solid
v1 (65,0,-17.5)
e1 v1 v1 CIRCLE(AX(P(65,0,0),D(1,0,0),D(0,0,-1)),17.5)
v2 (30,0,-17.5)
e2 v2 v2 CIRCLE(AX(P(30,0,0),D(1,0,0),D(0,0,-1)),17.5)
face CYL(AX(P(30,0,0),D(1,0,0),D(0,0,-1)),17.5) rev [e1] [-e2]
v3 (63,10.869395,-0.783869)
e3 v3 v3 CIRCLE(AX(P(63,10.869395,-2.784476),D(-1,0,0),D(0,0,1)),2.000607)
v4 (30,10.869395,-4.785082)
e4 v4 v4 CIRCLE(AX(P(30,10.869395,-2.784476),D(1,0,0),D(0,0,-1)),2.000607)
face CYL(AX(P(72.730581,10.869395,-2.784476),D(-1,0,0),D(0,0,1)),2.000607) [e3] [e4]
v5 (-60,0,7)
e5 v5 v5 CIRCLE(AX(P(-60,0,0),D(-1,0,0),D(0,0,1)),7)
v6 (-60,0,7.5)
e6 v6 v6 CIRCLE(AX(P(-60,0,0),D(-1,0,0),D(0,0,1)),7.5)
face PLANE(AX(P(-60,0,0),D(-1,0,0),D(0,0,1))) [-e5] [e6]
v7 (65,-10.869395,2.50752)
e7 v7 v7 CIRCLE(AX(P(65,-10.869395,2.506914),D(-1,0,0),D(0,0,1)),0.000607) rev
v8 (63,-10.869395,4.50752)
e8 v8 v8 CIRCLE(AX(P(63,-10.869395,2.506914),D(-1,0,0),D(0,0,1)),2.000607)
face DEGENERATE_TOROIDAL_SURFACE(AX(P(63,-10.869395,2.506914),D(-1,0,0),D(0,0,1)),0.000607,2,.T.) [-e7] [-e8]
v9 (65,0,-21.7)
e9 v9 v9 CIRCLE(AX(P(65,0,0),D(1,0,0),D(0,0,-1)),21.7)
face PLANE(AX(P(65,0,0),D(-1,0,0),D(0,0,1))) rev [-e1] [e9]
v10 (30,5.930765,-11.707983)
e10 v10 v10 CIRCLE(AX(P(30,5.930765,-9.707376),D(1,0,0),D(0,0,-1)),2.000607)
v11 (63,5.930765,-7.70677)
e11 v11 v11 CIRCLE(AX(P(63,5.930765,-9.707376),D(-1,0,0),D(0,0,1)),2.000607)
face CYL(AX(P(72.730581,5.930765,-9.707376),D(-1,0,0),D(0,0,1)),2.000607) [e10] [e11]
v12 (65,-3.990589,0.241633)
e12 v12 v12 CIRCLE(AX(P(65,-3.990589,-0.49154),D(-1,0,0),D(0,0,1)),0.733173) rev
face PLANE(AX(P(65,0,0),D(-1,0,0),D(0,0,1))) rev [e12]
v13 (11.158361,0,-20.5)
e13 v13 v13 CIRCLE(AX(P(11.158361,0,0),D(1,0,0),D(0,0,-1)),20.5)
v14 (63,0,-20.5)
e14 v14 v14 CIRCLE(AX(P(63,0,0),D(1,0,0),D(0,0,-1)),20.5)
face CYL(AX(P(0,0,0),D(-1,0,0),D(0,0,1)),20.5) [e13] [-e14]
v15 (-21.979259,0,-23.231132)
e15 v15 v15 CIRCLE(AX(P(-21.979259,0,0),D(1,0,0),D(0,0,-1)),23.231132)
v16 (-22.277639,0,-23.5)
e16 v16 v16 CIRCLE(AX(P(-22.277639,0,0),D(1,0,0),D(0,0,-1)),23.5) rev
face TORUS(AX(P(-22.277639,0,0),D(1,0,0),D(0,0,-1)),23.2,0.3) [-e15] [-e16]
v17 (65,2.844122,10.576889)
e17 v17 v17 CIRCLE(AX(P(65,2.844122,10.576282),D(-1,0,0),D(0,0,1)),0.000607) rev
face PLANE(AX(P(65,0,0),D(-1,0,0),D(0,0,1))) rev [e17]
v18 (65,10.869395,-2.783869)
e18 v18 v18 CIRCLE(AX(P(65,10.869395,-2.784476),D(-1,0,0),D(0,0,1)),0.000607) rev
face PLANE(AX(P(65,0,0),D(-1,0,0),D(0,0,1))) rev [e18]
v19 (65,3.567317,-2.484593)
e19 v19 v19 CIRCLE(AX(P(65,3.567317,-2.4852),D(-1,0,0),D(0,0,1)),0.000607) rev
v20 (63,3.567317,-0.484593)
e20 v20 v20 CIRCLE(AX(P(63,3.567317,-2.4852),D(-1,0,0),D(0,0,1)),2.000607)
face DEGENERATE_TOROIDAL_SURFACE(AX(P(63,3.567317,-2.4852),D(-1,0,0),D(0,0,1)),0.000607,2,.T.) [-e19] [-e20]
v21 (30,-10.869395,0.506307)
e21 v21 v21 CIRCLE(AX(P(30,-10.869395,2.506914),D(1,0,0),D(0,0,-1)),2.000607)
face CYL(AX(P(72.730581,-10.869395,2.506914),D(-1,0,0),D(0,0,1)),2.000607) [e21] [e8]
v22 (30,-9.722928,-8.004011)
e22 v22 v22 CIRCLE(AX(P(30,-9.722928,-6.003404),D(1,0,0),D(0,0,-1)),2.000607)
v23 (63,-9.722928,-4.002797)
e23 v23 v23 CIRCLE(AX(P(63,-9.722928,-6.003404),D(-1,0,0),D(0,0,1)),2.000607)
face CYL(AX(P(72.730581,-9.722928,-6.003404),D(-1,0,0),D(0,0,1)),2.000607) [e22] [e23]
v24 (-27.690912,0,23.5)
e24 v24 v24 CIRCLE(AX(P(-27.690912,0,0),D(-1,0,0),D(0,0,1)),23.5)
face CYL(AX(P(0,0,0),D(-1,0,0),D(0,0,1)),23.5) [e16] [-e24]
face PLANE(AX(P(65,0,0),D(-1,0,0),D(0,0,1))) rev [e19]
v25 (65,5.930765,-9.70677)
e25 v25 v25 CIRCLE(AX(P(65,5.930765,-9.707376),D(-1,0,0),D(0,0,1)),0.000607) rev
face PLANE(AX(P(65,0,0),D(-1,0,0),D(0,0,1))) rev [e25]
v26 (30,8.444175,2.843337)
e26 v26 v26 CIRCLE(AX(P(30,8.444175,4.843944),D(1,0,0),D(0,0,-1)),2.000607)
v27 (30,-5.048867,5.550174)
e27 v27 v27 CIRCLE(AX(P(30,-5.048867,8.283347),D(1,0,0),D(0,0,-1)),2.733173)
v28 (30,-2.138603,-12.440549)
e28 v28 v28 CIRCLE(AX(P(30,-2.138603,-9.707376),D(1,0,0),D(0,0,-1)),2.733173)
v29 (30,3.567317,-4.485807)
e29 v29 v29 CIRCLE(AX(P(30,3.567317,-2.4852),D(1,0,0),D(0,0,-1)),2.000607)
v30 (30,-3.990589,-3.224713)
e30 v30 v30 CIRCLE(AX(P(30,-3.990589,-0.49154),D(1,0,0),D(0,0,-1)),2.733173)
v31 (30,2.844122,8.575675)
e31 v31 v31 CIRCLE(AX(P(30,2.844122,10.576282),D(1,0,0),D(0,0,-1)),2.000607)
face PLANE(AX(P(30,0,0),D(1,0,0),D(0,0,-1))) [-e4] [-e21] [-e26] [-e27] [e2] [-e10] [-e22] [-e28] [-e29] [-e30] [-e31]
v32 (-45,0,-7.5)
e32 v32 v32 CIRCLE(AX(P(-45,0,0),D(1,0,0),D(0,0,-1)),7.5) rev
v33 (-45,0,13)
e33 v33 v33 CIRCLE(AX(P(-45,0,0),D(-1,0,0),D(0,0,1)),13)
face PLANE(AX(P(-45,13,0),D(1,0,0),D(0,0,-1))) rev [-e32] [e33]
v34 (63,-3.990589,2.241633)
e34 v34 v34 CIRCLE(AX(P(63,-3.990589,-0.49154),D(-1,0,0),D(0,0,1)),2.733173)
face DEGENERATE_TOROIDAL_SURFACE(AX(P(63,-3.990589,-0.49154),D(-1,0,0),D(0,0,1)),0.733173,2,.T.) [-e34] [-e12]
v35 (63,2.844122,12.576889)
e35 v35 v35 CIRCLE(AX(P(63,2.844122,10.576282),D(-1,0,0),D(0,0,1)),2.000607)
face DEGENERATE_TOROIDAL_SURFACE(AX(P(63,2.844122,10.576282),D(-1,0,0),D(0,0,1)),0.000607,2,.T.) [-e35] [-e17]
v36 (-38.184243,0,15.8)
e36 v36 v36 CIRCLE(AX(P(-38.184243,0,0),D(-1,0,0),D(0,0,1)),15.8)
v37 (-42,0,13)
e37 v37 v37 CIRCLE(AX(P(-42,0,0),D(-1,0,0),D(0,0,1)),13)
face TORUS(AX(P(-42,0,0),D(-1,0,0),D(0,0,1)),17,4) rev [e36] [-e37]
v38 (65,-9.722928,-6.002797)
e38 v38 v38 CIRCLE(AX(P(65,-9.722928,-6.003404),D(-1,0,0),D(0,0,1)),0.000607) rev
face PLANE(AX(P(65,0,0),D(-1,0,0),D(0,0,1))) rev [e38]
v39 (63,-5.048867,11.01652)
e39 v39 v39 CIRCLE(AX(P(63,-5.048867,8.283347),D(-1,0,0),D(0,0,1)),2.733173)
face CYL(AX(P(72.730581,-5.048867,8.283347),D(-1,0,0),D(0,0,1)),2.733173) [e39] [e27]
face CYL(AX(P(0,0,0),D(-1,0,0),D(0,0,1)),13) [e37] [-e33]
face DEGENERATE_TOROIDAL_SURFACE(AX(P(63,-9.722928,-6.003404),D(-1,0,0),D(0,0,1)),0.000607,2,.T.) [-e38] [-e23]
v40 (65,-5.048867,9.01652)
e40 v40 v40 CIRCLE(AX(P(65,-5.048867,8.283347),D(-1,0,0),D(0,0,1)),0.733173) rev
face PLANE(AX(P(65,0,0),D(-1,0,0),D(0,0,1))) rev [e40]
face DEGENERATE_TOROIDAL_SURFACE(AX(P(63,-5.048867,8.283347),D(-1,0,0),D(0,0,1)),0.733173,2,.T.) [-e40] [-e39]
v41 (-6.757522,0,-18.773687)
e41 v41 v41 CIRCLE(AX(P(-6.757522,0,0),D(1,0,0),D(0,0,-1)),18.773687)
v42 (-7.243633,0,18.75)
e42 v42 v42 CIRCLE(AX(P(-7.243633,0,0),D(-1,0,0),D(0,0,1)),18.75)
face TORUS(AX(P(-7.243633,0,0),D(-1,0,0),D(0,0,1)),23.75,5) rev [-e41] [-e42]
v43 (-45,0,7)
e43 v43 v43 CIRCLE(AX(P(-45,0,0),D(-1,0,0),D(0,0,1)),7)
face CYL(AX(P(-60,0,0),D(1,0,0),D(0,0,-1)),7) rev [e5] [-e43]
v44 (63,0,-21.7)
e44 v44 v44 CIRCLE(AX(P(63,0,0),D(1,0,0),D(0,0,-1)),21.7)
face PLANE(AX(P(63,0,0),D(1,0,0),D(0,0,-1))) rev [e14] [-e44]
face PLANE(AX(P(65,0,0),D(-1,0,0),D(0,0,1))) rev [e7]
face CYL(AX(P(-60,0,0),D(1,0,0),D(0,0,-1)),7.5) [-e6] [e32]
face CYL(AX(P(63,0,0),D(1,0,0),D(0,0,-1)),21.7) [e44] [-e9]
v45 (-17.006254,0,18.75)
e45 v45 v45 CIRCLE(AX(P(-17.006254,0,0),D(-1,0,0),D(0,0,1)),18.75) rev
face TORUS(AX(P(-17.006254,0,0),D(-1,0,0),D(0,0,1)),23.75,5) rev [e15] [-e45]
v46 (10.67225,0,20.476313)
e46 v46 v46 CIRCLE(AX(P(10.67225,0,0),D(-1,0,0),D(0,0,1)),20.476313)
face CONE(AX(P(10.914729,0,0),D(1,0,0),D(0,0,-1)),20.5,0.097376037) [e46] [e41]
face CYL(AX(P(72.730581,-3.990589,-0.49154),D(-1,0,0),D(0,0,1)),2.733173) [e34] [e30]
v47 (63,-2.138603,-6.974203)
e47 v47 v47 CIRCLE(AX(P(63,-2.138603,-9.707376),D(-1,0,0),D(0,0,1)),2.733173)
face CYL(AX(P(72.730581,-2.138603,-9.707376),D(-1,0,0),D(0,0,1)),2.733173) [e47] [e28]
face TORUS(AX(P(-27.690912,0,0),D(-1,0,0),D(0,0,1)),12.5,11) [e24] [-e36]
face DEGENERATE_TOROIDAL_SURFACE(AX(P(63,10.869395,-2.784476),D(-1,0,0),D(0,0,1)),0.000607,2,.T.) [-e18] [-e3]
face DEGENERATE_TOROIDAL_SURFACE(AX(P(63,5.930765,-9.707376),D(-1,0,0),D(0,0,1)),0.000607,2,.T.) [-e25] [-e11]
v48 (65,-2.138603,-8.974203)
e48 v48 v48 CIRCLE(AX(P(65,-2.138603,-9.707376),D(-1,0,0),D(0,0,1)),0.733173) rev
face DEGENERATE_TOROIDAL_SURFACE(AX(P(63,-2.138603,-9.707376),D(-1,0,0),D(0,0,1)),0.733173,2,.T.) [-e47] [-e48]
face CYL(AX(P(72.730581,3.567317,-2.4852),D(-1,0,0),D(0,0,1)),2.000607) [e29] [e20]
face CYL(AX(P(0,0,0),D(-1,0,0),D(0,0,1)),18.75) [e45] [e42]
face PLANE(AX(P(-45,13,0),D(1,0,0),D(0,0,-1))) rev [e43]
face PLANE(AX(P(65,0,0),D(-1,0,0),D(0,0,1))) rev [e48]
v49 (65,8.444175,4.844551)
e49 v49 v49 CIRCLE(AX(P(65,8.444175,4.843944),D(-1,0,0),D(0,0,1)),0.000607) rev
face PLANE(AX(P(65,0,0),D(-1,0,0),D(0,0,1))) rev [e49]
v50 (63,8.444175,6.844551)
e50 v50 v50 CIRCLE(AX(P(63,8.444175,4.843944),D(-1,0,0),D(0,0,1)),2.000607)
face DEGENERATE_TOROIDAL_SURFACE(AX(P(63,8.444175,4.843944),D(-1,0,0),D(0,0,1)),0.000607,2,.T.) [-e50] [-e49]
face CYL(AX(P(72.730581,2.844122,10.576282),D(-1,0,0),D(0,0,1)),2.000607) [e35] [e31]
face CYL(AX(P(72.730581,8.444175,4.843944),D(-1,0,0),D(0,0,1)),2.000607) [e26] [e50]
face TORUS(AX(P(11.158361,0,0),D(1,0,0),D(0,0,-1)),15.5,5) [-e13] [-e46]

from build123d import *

# Parameters (mm, degrees)
FILLET1_R           = 5
FILLET2_R           = 0.3
FILLET3_R           = 5
SKETCH4_R           = 17.500000000000004
CUT_EXTRUDE1_DEPTH  = 35
SKETCH5_R           = 2.0006066698857174
SKETCH5_R_2         = 2.0006066698857157
SKETCH5_R_3         = 2.000606669885716
SKETCH5_R_4         = 2.733173099565215
BOSS_EXTRUDE1_DEPTH = 35
FILLET4_R           = 2
BOSS_EXTRUDE2_START = -2
SKETCH6_R           = 21.7
SKETCH6_R_2         = 20.5
BOSS_EXTRUDE2_DEPTH = 2
SKETCH7_R           = 7.5
SKETCH7_R_2         = 7
EXTRUDE_THIN1_DEPTH = 15


with BuildPart() as part:
    # Sketch3 → Revolve1 (revolve)
    with BuildSketch(Plane.XY, mode=Mode.PRIVATE) as revolve1_sk:
        with BuildLine():
            Line((65, 0), (65, 20.5))
            Line((65, 20.5), (10.914728577346645, 20.499999999999993))
            Line((10.914728577346645, 20.499999999999993), (-6.999999999999965, 18.75))
            Line((-6.999999999999965, 18.75), (-21.999999999999996, 18.749999999999993))
            Line((-21.999999999999996, 18.749999999999993), (-21.999999999999996, 23.5))
            Line((-21.999999999999996, 23.5), (-27.690911978745813, 23.5))
            ThreePointArc((-27.690911978745813, 23.5), (-34.19859974015539, 21.368483523128404), (-38.18424319433221, 15.800000000000004))
            ThreePointArc((-38.18424319433221, 15.800000000000004), (-39.63356808676015, 13.775096900680587), (-41.99999999999999, 13.000000000000009))
            Line((-41.99999999999999, 13.000000000000009), (-45, 13.000000000000004))
            Line((-45, 13.000000000000004), (-45, 0))
            Line((-45, 0), (-41.99999999999999, 0))
            Line((-41.99999999999999, 0), (65, 0))
        make_face()
    revolve(revolve1_sk.sketch.rotate(Axis((0, 0, 0), (1, 0, 0)), 90), axis=Axis((0, 0, 0), (1, 0, 0)))

    # Fillet1
    # the kernel refuses this fillet: 5 mm, written as the material it adds along each edge
    with BuildSketch(Plane(origin=(-21.999999999999996, 0, 0), x_dir=(0, 1.1e-16, 1), z_dir=(0, 1, -1.1e-16))) as fillet1_piece_1:
        with BuildLine():
            CenterArc((23.75, 4.993746088859545), FILLET1_R, 180, 87.13401601740111)
            Line((23.5, 0), (23.495, -0.09987492177718948))
            ThreePointArc((23.495, -0.09987492177718948), (21.124999999999996, -0.10000000000000142), (18.749999999999993, -0.10000000000000142))
            Line((18.749999999999993, -0.10000000000000142), (18.64999999999999, 0))
            Line((18.64999999999999, 0), (18.65, 4.993746088859545))
            Line((18.65, 4.993746088859545), (18.75, 4.993746088859545))
        make_face()
    revolve(axis=Axis((-21.999999999999996, 0, 0), (1, 0, 0)))

    # Fillet2
    fillet2_edges = [part.edges().sort_by_distance(p)[0] for p in [
        (-21.999999999999996, 4.95e-15, -23.5),
    ]]
    fillet(fillet2_edges, radius=FILLET2_R)

    # Fillet3
    # the kernel refuses this fillet: 5 mm, written as the material it adds along each edge
    with BuildSketch(Plane(origin=(-6.999999999999965, 0, 0), x_dir=(0, 1.1e-16, 1), z_dir=(0, 1, -1.1e-16))) as fillet3_piece_1:
        with BuildLine():
            CenterArc((18.75 + FILLET3_R, -FILLET3_R * 0.0487265272305), FILLET3_R, 174.42076403235384, 5.579235967646127)
            Line((18.75 + FILLET3_R * 0.00473730125852, FILLET3_R * 0.0484956949917), (18.75, 0))
            Line((18.75, 0), (18.75, -FILLET3_R * 0.0487265272305))
        make_face()
    revolve(axis=Axis((-6.999999999999965, 0, 0), (1, 0, 0)))
    # the kernel refuses this fillet: 5 mm, written as the material it takes off along each edge
    with BuildSketch(Plane(origin=(10.914728577346645, 0, 0), x_dir=(0, 1.1e-16, 1), z_dir=(0, 1, -1.1e-16))) as fillet3_2_piece_1:
        with BuildLine():
            CenterArc((20.499999999999993 - FILLET3_R, FILLET3_R * 0.0487265272305), FILLET3_R, 354.4207640323539, 5.579235967646187)
            Line((20.499999999999993, FILLET3_R * 0.0487265272305), (20.499999999999993, 0))
            Line((20.499999999999993, 0), (20.499999999999993 - FILLET3_R * 0.00473730125852, -FILLET3_R * 0.0484956949917))
        make_face()
    revolve(axis=Axis((10.914728577346645, 0, 0), (1, 0, 0)), mode=Mode.SUBTRACT)

    # Sketch4 → Cut-Extrude1 (cut)
    with BuildSketch(Plane(origin=(65, 0, 0), x_dir=(0, 0, -1), z_dir=(1, 0, 0))):
        Circle(SKETCH4_R)
    extrude(amount=-CUT_EXTRUDE1_DEPTH, mode=Mode.SUBTRACT)

    # Sketch5 → Boss-Extrude1 (add)
    with BuildSketch(Plane(origin=(30, 0, 0), x_dir=(0, 0, -1), z_dir=(1, 0, 0))):
        with Locations(Location((2.4851998621818705, 3.5673165613128455, 0), (0, 0, 180))):
            Circle(SKETCH5_R)
        with Locations(Location((2.784475529300205, 10.869395236751556, 0), (0, 0, 180))):
            Circle(SKETCH5_R_2)
        with Locations(Location((-4.843943845783035, 8.444175204210639, 0), (0, 0, 180))):
            Circle(SKETCH5_R)
        with Locations(Location((-10.576282104516107, 2.8441216745252547, 0), (0, 0, 180))):
            Circle(SKETCH5_R_3)
        with Locations(Location((9.707376349462452, 5.930765352304601, 0), (0, 0, 180))):
            Circle(SKETCH5_R_3)
        with Locations(Location((-2.5069136326072483, -10.869395236751556, 0), (0, 0, 180))):
            Circle(SKETCH5_R)
        with Locations(Location((6.003403936127238, -9.722927585004939, 0), (0, 0, 180))):
            Circle(SKETCH5_R)
        with Locations(Location((9.707376349462452, -2.1386031196042588, 0), (0, 0, 180))):
            Circle(SKETCH5_R_4)
        with Locations(Location((0.49154022580697854, -3.990589326271869, 0), (0, 0, 180))):
            Circle(SKETCH5_R_4)
        with Locations(Location((-8.28334680102288, -5.048867158653359, 0), (0, 0, 180))):
            Circle(SKETCH5_R_4)
    extrude(amount=BOSS_EXTRUDE1_DEPTH)

    # Fillet4
    fillet4_edges = [part.edges().sort_by_distance(p)[0] for p in [
        (65, 3.567316561312845, -4.485806532067588),
        (65, 10.869395236751556, -4.78508219918592),
        (65, 8.444175204210639, 2.8433371758973176),
        (65, 2.844121674525254, 8.57567543463039),
        (65, 5.9307653523046, -11.707983019348168),
        (65, -10.869395236751556, 0.5063069627215309),
        (65, -9.722927585004939, -8.004010606012956),
        (65, -2.1386031196042583, -12.440549449027667),
        (65, -3.9905893262718686, -3.2247133253721936),
        (65, -5.0488671586533584, 5.550173701457664),
    ]]
    fillet(fillet4_edges, radius=FILLET4_R)

    # Sketch6 → Boss-Extrude2 (add)
    with BuildSketch(Plane(origin=(65, 0, 0), x_dir=(0, 0, -1), z_dir=(1, 0, 0)).offset(BOSS_EXTRUDE2_START)):
        Circle(SKETCH6_R)
        Circle(SKETCH6_R_2, mode=Mode.SUBTRACT)
    extrude(amount=BOSS_EXTRUDE2_DEPTH)

    # Sketch7 → Extrude-Thin1 (add)
    with BuildSketch(Plane.ZY.offset(45)):
        Circle(SKETCH7_R)
        Circle(SKETCH7_R_2, mode=Mode.SUBTRACT)
    extrude(amount=EXTRUDE_THIN1_DEPTH)


solid = part.part
